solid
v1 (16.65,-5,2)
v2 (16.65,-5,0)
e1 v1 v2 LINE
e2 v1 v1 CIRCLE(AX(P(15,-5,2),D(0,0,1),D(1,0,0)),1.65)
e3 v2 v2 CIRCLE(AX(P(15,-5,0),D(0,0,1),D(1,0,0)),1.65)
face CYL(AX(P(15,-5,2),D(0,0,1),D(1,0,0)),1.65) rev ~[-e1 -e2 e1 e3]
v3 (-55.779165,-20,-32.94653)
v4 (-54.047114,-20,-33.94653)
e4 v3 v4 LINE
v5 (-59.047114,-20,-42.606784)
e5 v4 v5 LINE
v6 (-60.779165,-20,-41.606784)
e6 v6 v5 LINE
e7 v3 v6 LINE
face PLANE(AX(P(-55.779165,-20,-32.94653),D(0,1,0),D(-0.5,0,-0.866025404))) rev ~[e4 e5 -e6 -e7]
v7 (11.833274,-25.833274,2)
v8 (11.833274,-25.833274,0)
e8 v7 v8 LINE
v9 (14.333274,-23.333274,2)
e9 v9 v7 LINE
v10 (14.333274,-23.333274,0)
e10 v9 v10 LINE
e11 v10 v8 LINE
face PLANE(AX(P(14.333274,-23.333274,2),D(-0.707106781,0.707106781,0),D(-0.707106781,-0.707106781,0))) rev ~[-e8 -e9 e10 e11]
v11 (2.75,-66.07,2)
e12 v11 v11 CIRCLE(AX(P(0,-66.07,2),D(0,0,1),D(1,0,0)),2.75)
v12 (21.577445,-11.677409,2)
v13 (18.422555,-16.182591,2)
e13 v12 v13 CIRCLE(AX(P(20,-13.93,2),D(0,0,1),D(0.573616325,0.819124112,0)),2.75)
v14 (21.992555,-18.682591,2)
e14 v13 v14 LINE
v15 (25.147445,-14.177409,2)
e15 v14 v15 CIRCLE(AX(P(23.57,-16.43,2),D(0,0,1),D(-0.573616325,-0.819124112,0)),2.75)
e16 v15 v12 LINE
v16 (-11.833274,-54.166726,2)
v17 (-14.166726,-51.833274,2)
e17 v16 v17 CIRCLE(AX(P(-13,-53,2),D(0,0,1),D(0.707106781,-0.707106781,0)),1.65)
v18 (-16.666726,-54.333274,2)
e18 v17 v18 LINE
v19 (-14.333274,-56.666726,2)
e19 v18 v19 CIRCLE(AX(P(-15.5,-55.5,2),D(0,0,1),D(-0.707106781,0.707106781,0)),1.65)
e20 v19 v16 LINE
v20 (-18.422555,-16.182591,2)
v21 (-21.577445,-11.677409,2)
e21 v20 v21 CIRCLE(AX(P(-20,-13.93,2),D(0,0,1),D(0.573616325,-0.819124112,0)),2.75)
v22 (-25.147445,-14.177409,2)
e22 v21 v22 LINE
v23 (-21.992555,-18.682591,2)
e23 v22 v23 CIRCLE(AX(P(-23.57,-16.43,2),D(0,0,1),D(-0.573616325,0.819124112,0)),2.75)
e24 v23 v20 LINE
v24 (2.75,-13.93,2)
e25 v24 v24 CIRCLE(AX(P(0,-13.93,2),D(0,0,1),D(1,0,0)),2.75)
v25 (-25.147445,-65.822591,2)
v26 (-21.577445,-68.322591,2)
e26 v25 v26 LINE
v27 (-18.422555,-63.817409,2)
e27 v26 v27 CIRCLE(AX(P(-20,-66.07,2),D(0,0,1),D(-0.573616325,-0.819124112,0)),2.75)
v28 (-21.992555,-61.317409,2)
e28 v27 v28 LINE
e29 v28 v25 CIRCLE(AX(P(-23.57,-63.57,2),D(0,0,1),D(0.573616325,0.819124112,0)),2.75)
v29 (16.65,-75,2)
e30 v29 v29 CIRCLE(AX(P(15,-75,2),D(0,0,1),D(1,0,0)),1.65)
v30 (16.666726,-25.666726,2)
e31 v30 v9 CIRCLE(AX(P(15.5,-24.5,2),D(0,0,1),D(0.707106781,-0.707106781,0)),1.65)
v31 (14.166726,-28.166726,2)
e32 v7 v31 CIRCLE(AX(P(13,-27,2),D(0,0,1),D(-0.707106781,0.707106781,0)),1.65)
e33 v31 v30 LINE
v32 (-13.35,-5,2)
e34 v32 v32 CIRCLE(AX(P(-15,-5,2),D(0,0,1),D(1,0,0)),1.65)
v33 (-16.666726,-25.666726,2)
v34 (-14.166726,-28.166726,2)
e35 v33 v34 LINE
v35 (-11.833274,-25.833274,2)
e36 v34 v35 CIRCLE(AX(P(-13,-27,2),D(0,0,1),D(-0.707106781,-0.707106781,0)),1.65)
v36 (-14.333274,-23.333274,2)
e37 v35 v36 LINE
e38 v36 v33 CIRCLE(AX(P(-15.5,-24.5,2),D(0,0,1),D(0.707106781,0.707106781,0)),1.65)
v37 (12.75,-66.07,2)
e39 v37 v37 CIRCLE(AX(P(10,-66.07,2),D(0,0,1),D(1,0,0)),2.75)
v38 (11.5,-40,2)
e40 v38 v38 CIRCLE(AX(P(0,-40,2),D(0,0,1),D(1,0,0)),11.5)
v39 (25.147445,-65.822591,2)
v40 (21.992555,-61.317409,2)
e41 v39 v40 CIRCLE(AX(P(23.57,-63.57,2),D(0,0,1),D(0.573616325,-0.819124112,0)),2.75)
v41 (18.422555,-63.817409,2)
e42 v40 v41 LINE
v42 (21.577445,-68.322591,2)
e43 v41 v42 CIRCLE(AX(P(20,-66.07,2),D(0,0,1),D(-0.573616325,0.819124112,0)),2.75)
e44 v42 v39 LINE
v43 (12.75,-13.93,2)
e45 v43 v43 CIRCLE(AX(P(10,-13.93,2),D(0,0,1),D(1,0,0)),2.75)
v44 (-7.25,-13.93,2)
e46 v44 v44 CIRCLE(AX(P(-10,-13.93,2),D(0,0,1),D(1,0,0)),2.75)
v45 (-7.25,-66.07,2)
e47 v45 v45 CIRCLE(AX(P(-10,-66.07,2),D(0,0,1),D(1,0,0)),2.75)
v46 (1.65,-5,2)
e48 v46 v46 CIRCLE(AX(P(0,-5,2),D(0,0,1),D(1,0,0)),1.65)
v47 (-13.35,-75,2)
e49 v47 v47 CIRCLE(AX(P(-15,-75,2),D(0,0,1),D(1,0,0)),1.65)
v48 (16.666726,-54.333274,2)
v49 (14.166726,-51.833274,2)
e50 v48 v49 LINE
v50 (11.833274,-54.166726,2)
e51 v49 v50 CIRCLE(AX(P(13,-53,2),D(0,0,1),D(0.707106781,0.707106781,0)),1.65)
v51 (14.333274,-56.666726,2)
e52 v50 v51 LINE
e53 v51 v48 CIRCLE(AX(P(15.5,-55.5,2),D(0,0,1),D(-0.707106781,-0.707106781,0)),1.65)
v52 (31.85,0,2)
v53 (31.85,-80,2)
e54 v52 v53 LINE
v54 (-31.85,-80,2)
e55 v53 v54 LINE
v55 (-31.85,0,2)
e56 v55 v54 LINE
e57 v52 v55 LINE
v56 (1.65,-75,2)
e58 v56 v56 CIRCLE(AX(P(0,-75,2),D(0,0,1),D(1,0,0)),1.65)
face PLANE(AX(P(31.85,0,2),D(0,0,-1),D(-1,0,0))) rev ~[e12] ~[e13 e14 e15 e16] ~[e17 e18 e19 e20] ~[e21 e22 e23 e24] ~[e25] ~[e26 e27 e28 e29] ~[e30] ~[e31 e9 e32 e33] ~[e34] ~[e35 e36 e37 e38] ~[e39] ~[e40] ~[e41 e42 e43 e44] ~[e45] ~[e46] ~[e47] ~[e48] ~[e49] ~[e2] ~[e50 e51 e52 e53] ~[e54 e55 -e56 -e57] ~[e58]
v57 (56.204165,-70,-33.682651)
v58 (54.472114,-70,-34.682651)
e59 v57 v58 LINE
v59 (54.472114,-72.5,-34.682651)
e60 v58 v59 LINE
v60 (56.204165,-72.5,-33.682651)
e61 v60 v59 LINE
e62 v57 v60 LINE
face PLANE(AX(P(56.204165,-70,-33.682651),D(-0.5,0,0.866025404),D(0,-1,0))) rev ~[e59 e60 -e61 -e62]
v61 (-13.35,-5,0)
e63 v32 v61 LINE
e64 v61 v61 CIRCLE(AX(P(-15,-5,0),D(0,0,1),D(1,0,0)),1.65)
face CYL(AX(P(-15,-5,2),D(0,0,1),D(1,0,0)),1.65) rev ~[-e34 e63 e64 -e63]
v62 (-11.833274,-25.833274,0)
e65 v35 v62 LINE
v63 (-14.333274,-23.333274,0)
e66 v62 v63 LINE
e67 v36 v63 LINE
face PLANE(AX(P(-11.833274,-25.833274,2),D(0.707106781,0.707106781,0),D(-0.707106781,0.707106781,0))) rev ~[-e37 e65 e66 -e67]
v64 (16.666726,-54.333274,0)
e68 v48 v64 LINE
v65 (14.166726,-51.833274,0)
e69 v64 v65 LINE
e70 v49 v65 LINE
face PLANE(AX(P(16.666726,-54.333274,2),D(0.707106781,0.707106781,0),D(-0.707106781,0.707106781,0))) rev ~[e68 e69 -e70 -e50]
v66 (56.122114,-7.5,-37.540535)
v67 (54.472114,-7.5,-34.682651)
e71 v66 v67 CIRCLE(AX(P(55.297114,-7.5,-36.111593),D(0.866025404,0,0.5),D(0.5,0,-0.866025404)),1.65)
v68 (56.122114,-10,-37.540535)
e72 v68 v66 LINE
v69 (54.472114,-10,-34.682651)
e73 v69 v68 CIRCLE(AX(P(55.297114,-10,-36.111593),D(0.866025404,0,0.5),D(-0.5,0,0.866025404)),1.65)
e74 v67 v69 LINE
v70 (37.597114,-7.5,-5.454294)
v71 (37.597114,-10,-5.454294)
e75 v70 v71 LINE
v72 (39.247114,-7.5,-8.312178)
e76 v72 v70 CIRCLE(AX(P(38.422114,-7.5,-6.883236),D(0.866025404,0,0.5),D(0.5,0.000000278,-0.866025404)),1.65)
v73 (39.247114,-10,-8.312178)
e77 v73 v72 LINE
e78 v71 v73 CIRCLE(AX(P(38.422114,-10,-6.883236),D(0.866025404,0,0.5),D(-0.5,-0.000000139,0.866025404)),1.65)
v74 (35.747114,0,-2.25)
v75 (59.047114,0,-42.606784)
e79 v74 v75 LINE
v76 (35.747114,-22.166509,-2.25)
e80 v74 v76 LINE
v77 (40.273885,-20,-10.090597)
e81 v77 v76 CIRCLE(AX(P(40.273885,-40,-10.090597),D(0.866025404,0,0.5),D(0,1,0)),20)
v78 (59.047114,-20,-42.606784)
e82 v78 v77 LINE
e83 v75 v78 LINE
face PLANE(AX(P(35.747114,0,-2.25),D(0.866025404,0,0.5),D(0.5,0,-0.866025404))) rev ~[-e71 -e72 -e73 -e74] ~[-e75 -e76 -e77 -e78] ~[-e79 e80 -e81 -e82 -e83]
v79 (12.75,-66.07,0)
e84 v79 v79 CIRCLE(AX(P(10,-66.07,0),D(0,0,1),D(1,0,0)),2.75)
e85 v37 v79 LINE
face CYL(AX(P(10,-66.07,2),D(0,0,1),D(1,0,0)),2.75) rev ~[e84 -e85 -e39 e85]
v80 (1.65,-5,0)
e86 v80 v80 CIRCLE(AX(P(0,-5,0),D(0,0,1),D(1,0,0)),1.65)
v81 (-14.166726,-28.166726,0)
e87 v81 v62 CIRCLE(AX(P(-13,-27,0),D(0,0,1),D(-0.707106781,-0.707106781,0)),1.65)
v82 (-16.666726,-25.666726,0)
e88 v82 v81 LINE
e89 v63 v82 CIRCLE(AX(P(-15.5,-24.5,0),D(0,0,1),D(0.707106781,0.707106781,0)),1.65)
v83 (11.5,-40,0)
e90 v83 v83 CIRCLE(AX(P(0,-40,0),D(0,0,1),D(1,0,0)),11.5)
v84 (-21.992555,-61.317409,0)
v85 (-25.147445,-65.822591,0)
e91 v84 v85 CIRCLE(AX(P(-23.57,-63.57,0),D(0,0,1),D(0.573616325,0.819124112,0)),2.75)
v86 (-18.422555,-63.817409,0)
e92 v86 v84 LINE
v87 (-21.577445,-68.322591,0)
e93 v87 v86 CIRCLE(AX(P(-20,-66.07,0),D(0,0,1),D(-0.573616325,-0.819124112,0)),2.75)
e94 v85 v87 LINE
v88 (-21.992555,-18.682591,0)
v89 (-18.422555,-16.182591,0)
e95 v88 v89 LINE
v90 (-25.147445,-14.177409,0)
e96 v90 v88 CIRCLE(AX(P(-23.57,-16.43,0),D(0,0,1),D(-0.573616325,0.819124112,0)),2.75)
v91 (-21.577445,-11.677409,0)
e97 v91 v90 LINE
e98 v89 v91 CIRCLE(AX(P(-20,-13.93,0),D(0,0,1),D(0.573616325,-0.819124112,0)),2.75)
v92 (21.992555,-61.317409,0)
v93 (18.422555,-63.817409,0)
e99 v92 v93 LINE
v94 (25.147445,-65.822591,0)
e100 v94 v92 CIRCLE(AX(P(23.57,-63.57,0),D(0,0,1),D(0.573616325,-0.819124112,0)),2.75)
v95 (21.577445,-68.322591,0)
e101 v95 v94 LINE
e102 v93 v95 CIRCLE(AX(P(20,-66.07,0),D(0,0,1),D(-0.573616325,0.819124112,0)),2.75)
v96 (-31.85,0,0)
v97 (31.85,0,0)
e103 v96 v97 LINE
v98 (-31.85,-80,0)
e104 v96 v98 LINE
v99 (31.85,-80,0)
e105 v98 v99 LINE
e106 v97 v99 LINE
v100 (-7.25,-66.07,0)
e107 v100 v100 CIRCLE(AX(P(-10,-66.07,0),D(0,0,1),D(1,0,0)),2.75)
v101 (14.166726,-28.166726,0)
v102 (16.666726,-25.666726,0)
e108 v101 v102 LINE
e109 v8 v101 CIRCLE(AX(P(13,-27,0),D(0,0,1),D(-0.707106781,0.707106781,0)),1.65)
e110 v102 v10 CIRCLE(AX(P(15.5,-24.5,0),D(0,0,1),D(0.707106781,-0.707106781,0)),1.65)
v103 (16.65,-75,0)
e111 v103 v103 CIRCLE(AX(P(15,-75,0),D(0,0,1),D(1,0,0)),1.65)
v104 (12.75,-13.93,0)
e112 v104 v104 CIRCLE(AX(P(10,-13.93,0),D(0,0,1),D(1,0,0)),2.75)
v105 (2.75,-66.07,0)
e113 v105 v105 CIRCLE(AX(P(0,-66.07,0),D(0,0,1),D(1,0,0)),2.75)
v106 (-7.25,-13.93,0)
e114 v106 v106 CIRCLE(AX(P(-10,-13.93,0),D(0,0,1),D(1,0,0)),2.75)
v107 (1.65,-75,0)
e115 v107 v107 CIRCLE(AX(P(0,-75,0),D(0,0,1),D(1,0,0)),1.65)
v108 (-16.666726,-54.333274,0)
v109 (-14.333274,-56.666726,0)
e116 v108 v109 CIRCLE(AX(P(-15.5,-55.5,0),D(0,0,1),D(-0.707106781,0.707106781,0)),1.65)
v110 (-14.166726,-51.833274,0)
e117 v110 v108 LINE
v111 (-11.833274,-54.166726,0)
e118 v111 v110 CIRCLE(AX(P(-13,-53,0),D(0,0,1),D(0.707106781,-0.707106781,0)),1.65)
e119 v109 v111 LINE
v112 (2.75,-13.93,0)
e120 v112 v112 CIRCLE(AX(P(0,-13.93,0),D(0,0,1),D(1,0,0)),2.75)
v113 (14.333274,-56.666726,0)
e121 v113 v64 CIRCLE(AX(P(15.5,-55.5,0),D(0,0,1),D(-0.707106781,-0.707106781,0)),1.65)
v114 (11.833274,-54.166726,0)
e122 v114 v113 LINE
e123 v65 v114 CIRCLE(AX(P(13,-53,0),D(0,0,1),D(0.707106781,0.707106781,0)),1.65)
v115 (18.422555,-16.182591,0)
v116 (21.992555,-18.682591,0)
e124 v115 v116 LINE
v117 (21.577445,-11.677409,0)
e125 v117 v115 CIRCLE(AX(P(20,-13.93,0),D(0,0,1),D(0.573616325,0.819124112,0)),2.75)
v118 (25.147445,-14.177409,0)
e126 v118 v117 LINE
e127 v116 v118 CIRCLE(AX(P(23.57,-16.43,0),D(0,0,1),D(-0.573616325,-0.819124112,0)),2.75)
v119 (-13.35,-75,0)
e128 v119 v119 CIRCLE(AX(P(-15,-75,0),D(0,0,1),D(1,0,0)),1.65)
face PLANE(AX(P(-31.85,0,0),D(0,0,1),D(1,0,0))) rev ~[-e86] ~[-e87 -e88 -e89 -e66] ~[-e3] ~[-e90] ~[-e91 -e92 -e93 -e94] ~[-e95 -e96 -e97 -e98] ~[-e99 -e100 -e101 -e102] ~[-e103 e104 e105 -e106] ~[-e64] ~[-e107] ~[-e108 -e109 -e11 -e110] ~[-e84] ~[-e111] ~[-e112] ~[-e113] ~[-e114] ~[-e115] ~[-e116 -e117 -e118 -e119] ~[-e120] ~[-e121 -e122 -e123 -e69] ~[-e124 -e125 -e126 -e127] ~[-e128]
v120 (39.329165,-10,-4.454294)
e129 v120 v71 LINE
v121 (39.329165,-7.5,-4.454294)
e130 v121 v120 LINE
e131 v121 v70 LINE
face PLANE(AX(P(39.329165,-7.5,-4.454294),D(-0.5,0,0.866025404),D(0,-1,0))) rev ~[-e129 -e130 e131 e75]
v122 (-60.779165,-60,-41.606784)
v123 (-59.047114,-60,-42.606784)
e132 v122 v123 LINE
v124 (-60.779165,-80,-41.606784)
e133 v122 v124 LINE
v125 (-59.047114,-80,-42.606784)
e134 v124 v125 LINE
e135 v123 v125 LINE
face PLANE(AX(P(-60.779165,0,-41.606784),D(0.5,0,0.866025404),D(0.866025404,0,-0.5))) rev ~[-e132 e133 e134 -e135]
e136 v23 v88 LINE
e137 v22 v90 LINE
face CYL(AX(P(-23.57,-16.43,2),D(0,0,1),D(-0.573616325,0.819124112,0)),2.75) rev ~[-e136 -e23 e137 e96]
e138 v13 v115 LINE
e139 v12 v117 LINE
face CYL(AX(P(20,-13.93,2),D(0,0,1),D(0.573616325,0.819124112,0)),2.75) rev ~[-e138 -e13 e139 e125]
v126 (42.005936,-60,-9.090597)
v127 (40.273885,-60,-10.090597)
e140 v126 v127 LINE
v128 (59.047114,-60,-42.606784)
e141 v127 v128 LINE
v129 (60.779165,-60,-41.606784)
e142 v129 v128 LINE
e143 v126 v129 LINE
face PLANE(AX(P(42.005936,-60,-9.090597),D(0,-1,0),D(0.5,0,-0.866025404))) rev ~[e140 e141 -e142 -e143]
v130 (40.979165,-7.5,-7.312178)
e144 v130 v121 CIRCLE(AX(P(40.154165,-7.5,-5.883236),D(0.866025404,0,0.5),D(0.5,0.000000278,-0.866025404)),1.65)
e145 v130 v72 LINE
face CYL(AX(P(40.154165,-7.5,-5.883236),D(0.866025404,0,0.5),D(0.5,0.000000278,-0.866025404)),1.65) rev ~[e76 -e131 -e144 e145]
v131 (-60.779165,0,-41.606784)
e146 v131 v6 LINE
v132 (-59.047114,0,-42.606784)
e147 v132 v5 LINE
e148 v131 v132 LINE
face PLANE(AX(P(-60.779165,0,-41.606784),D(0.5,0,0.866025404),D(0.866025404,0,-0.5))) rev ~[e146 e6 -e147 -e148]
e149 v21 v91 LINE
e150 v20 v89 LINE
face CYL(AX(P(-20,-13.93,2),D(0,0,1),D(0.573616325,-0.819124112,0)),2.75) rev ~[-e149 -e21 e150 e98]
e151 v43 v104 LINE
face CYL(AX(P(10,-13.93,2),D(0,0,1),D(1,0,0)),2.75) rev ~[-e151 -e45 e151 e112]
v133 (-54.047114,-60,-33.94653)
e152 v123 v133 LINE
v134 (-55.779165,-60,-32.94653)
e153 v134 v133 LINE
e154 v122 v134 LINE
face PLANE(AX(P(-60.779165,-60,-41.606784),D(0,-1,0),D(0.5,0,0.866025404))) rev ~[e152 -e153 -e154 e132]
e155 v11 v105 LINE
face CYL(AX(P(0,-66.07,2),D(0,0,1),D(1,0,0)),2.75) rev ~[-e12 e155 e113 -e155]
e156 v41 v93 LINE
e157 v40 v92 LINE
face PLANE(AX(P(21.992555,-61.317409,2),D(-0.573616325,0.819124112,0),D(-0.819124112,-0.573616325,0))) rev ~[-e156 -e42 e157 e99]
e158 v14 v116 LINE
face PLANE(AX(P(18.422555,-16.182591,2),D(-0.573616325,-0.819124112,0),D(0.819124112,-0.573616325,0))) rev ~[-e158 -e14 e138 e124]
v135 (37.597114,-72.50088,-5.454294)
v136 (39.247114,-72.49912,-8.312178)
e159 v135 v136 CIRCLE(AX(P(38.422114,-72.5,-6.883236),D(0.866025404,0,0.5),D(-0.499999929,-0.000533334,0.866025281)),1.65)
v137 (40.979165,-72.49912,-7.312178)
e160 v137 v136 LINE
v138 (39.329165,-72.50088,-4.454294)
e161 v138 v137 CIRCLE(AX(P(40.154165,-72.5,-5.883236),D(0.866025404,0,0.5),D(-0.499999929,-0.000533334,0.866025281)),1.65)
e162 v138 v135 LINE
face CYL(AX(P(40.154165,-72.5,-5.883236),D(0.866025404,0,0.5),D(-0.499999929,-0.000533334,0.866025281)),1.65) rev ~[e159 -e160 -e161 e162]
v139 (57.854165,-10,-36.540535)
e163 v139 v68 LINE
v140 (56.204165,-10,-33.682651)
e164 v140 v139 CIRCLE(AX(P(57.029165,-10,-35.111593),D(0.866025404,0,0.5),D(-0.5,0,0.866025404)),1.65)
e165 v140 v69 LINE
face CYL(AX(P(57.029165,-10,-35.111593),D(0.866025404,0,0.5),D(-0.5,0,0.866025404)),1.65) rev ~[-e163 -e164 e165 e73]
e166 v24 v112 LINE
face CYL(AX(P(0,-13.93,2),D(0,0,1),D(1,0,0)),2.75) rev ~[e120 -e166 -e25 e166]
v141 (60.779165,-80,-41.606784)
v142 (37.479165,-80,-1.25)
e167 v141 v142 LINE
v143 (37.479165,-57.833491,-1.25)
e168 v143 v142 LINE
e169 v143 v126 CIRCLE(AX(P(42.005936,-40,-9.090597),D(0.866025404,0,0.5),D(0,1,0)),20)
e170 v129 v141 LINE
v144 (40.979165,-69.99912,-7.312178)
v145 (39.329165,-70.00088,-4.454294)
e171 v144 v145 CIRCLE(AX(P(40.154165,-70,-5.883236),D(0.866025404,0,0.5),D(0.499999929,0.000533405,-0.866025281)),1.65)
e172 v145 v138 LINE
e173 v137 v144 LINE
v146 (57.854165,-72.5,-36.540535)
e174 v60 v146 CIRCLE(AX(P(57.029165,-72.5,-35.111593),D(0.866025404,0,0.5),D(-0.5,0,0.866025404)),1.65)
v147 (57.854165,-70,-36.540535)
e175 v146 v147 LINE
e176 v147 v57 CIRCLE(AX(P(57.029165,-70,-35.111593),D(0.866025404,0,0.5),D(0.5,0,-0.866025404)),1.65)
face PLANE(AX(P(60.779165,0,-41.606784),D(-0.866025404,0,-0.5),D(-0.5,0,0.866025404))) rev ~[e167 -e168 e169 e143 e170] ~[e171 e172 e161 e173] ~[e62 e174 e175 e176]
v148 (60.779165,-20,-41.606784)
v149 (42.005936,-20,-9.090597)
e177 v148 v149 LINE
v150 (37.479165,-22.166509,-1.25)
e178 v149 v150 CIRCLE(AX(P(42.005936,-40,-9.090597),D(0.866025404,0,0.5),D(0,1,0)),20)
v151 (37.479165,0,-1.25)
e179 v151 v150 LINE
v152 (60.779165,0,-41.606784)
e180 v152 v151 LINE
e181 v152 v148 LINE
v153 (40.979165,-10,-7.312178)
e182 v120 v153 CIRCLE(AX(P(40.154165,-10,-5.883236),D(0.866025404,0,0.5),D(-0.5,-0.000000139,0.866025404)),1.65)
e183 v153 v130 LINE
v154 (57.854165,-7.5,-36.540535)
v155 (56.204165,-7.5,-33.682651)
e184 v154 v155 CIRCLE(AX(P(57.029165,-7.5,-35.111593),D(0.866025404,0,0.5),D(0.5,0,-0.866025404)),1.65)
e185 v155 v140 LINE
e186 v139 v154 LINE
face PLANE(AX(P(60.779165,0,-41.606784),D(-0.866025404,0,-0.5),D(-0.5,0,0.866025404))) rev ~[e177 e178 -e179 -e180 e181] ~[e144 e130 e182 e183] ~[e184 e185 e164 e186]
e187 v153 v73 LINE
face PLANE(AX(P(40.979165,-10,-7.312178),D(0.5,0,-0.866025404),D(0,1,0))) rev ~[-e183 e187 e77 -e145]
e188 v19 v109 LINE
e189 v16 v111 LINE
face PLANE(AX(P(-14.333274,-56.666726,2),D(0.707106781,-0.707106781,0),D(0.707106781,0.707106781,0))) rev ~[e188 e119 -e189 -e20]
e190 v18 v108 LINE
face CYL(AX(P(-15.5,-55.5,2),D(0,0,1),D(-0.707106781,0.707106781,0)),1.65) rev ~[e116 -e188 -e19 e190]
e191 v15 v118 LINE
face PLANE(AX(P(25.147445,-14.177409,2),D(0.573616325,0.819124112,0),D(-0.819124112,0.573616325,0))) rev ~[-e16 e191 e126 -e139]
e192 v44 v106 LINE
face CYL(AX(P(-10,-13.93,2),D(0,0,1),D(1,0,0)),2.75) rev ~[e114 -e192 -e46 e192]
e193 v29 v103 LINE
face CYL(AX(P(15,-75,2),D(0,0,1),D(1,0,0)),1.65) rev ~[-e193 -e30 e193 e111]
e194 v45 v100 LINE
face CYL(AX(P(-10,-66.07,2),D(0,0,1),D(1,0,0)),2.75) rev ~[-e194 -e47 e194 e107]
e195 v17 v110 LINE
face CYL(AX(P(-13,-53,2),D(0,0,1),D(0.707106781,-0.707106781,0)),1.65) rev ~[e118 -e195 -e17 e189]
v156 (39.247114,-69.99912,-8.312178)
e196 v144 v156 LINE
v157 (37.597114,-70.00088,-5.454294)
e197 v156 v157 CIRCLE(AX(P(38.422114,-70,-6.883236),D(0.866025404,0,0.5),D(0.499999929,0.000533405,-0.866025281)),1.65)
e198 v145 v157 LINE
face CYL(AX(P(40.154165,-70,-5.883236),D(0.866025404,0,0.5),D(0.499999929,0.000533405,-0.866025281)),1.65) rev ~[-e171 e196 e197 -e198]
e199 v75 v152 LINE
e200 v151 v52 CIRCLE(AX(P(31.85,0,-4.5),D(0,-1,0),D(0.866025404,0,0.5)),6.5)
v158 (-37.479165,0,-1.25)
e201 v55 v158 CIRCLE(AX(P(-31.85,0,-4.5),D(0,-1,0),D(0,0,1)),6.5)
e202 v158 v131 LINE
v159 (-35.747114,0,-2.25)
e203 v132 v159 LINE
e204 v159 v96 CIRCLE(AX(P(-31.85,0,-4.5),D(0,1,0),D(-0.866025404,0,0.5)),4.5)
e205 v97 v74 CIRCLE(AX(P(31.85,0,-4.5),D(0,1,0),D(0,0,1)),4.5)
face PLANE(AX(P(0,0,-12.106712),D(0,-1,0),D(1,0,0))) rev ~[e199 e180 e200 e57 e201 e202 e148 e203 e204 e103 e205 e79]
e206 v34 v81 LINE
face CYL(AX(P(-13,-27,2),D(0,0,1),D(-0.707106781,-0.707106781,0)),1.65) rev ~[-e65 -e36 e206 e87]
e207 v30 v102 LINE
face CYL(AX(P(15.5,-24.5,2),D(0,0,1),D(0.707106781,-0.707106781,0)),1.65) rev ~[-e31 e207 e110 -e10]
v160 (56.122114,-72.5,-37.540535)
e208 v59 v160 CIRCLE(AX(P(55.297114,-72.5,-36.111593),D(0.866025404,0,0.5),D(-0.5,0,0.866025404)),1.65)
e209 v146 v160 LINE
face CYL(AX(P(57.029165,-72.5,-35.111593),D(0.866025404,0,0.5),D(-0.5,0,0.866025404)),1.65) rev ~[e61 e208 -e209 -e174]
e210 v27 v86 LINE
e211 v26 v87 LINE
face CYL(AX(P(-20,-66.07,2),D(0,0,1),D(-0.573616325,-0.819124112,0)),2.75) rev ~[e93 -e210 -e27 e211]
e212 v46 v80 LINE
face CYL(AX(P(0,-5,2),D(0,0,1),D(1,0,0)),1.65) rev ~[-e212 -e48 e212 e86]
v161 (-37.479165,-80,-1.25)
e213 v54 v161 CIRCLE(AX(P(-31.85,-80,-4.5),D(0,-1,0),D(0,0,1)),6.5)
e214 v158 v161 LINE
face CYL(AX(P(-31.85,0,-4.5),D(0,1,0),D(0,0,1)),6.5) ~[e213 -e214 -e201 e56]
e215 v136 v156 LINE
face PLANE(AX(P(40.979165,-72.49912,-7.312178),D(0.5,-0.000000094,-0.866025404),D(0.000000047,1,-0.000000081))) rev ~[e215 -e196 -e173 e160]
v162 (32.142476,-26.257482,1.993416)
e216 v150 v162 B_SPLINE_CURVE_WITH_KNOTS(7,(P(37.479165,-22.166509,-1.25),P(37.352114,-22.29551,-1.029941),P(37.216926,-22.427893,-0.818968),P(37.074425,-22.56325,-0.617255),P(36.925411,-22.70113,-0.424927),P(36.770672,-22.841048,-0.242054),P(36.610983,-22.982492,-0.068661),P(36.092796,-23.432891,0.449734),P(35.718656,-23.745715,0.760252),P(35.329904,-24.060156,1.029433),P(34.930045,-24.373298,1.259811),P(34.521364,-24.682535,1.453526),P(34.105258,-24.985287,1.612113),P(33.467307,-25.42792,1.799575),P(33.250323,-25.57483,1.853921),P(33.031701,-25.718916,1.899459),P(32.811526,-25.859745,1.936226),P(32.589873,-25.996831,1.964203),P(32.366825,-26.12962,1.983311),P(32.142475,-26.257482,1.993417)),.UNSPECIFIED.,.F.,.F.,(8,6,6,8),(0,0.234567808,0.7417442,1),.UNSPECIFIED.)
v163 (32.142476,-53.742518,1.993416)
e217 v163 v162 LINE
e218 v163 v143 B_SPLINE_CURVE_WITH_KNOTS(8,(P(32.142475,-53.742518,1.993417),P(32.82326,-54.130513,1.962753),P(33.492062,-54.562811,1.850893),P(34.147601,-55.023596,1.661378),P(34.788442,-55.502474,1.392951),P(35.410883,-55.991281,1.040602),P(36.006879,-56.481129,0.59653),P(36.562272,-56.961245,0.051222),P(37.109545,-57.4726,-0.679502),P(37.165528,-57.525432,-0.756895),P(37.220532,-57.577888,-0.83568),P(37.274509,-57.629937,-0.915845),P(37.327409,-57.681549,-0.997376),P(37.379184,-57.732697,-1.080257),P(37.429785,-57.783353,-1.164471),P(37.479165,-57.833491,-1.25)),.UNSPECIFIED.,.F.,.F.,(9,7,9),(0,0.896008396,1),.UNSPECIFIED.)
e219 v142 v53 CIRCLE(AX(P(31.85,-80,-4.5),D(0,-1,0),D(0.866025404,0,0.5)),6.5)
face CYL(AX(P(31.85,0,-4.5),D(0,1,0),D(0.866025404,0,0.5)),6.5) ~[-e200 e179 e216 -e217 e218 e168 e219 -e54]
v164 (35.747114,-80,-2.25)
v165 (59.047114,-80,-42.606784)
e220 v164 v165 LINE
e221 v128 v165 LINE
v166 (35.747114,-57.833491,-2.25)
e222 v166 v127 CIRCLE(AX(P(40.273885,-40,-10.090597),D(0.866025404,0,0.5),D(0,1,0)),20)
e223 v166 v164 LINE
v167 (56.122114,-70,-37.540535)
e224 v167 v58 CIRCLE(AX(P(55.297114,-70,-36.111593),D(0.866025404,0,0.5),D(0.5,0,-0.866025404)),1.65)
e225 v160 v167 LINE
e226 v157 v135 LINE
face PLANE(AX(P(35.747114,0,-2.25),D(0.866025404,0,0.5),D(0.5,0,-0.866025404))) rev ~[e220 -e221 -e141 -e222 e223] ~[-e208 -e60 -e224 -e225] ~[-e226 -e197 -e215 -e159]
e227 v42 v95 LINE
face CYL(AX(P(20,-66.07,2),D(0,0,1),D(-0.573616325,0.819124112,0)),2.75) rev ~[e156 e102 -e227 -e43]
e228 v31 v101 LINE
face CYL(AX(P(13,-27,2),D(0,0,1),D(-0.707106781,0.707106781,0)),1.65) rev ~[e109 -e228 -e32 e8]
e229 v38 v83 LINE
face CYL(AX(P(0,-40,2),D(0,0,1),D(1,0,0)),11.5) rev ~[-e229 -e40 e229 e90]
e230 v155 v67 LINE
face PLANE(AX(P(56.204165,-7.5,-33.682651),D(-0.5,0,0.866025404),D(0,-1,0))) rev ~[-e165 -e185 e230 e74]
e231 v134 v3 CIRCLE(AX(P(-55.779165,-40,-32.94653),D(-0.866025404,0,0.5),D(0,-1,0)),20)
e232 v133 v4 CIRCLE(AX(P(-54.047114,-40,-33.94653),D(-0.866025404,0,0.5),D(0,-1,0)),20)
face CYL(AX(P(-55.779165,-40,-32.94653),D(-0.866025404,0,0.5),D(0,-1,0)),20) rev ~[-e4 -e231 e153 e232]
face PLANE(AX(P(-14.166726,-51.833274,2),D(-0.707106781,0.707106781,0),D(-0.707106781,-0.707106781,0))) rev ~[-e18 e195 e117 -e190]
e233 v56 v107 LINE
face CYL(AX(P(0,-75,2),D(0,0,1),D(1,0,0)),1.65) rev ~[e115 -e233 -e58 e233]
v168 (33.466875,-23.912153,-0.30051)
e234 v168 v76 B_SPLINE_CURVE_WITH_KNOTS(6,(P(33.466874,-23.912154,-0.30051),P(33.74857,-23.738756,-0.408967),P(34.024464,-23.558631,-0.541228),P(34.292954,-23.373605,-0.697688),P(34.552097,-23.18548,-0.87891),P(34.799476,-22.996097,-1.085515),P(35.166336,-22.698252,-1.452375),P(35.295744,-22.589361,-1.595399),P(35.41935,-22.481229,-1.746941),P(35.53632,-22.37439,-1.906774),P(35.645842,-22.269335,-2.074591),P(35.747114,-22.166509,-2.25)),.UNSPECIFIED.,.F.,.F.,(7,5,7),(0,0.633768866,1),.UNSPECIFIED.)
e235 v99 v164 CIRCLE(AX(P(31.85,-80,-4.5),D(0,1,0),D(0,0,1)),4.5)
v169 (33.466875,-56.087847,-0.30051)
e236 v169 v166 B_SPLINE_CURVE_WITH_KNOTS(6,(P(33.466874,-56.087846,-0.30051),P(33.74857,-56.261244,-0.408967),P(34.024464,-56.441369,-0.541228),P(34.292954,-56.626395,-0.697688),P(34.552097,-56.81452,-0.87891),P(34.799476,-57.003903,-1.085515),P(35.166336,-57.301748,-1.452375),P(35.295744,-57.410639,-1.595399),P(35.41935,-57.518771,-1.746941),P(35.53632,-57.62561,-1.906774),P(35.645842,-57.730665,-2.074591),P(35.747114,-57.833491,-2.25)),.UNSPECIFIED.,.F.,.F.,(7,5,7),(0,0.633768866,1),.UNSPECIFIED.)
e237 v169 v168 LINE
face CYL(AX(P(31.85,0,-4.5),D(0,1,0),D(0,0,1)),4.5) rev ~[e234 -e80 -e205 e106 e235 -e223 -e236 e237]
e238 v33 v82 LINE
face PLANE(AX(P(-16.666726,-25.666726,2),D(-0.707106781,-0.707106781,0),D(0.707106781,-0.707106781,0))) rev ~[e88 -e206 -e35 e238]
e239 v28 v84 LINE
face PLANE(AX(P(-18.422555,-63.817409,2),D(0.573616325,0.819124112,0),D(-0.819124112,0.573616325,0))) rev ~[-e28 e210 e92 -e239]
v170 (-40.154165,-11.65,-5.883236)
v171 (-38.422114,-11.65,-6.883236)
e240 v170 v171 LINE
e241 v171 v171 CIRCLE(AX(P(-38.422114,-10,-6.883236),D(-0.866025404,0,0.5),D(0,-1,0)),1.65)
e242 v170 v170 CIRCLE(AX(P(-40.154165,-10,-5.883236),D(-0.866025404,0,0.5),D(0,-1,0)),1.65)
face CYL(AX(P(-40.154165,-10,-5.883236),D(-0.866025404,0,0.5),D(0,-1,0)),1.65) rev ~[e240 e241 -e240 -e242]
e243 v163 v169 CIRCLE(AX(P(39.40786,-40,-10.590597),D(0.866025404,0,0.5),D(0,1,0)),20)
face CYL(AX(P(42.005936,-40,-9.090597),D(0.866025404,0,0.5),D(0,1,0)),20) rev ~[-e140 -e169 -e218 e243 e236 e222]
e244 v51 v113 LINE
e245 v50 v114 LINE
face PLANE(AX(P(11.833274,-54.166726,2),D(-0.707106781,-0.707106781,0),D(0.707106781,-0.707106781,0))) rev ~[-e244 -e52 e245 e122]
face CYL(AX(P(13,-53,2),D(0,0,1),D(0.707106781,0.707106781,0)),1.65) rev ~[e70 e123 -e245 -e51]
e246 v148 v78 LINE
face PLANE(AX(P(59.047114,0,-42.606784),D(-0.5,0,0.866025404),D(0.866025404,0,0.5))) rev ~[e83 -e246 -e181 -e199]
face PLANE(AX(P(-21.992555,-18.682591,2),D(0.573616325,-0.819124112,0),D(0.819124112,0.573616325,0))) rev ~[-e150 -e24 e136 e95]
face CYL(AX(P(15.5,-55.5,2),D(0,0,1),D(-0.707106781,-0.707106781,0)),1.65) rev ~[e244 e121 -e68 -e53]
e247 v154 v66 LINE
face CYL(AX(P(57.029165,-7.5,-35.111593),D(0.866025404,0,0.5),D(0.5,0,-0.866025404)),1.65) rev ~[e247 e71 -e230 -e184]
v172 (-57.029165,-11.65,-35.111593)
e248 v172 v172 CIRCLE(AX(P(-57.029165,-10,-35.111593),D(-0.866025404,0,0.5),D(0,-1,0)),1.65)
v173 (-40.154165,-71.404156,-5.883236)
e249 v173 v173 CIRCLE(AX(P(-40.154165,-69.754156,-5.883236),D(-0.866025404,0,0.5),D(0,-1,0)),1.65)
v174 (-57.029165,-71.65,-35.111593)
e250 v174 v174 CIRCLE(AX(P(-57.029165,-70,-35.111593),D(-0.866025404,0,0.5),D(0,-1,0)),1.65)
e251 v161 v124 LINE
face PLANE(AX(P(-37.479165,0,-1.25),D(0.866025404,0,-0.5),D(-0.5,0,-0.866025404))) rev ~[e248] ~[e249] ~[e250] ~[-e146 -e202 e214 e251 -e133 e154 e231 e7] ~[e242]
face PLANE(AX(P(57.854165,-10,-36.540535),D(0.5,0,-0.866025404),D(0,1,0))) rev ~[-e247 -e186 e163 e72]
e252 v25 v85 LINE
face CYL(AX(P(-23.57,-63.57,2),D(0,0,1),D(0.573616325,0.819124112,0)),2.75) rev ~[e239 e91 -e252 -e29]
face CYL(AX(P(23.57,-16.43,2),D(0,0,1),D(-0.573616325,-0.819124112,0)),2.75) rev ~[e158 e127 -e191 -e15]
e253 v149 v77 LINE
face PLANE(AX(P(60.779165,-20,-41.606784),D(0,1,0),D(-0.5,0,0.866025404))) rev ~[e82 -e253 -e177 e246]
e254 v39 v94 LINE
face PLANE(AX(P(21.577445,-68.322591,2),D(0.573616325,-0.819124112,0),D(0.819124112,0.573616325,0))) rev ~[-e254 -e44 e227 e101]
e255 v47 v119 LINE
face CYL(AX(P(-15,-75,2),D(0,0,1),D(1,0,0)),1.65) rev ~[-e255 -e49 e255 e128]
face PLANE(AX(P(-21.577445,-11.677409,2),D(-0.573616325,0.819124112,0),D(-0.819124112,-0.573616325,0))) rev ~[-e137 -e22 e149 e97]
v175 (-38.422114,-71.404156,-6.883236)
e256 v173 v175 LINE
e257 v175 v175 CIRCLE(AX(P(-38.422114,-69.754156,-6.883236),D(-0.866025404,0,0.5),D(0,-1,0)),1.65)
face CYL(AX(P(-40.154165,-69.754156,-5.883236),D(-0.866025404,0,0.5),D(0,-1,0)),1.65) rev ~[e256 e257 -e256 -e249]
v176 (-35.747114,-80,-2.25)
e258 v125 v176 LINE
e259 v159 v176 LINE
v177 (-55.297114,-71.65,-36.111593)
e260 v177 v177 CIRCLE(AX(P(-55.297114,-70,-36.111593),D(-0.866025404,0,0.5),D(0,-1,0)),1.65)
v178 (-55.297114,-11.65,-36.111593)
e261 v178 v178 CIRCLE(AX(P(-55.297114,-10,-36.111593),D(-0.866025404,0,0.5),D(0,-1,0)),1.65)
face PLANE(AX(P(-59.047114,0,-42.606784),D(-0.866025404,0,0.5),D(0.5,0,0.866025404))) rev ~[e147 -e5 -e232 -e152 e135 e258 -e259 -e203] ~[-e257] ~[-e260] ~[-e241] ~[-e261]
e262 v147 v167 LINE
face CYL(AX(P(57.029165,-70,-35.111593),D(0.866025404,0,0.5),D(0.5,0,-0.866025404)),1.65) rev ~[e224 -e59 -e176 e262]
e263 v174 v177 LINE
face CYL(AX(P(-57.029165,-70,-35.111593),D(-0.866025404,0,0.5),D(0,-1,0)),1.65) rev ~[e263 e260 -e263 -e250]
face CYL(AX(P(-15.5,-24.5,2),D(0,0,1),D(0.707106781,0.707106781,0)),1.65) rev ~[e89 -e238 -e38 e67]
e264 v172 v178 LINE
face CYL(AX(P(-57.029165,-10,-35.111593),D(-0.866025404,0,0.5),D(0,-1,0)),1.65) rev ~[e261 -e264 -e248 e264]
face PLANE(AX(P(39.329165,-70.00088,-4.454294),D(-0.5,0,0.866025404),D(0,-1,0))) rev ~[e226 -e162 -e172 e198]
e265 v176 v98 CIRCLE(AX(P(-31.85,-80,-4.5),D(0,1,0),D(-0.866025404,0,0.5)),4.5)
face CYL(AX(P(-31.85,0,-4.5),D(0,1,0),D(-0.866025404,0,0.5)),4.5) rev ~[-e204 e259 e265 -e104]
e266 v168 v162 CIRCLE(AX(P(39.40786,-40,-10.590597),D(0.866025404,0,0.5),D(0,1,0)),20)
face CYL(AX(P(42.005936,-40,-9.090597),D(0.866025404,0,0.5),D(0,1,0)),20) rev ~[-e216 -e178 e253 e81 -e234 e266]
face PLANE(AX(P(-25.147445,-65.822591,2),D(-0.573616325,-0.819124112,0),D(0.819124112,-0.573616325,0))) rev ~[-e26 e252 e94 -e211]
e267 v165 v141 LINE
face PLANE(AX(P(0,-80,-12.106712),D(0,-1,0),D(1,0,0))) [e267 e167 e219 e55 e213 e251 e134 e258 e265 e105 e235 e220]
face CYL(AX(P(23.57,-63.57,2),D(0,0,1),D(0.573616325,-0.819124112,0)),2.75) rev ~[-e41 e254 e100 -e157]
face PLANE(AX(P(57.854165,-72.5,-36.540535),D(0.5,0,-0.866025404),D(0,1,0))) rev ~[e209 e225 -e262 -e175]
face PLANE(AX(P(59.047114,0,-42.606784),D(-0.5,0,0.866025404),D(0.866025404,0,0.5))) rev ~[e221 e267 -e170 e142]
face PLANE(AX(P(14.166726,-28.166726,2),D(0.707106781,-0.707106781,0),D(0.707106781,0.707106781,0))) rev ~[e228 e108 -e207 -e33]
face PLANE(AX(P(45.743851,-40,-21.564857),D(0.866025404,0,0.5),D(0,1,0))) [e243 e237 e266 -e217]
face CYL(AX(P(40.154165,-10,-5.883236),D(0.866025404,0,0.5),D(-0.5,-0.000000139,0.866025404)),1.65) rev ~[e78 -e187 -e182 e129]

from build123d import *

# Parameters (mm, degrees)
F1_DEPTH = 80
F3_DEPTH = 3
F4_R     = 1.65
F5_DEPTH = 3
F6_R     = 11.5
F6_R_2   = 1.65
F6_R_3   = 2.75
F7_DEPTH = 3


# Not quite as in the source:
# - ends of sketch curves that miss each other by under 0.0002 mm in the source are joined


with BuildPart() as f1:
    # F0 (on Front) → F1 (new body)
    with BuildSketch(Plane.XZ):
        with BuildLine():
            ThreePointArc((-35.747114317, -2.25), (-34.1, -0.602885683), (-31.85, 0))
            Line((-31.85, 0), (31.85, 0))
            ThreePointArc((31.85, 0), (34.1, -0.602885683), (35.747114317, -2.25))
            Line((35.747114317, -2.25), (59.047114317, -42.6067838164))
            Line((59.047114317, -42.6067838164), (60.7791651246, -41.6067838164))
            Line((60.7791651246, -41.6067838164), (37.4791651246, -1.25))
            ThreePointArc((37.4791651246, -1.25), (35.1, 1.1291651246), (31.85, 2))
            Line((31.85, 2), (-31.85, 2))
            ThreePointArc((-31.85, 2), (-35.1, 1.1291651246), (-37.4791651246, -1.25))
            Line((-37.4791651246, -1.25), (-60.7791651246, -41.6067838164))
            Line((-60.7791651246, -41.6067838164), (-59.047114317, -42.6067838164))
            Line((-59.047114317, -42.6067838164), (-35.747114317, -2.25))
        make_face()
    extrude(amount=F1_DEPTH)

    # F2 (on face) → F3 (cut)
    with BuildSketch(Plane(origin=(27.5681079661, 0, 15.9164545553), x_dir=(0, 1, 0), z_dir=(0.8660254038, 0, 0.5))):
        with BuildLine():
            Line((-20, -66.422114317), (-20, -28.8756559143))
            ThreePointArc((-20, -28.8756559143), (-40, -8.8756559143), (-60, -28.8756559143))
            Line((-60, -28.8756559143), (-60, -66.422114317))
            Line((-60, -66.422114317), (-20, -66.422114317))
        make_face()
        with BuildLine():
            Line((-72.5, -60.572114317), (-70, -60.572114317))
            ThreePointArc((-70, -60.572114317), (-68.35, -58.922114317), (-70, -57.272114317))
            Line((-70, -57.272114317), (-72.5, -57.272114317))
            ThreePointArc((-72.5, -57.272114317), (-74.15, -58.922114317), (-72.5, -60.572114317))
        make_face()
        with BuildLine():
            Line((-70.0008798832, -23.522114317), (-72.5008798832, -23.522114317))
            ThreePointArc((-72.5008798832, -23.522114317), (-74.1499997654, -25.1729942001), (-72.499120117, -26.8221140824))
            Line((-72.499120117, -26.8221140824), (-69.9991201168, -26.822114317))
            ThreePointArc((-69.9991201168, -26.822114317), (-68.3500002346, -25.171234434), (-70.0008798832, -23.522114317))
        make_face()
        with BuildLine():
            Line((-9.9999995409, -26.822114317), (-7.4999995409, -26.822114317))
            ThreePointArc((-7.4999995409, -26.822114317), (-5.85, -25.1721140875), (-7.5, -23.522114317))
            Line((-7.5, -23.522114317), (-10, -23.522114317))
            ThreePointArc((-10, -23.522114317), (-11.6499997705, -25.1721145466), (-9.9999995409, -26.822114317))
        make_face()
        with BuildLine():
            Line((-10, -60.572114317), (-7.5, -60.572114317))
            ThreePointArc((-7.5, -60.572114317), (-5.85, -58.922114317), (-7.5, -57.272114317))
            Line((-7.5, -57.272114317), (-10, -57.272114317))
            ThreePointArc((-10, -57.272114317), (-11.65, -58.922114317), (-10, -60.572114317))
        make_face()
    extrude(amount=-F3_DEPTH, mode=Mode.SUBTRACT)

    # F4 (on face) → F5 (cut)
    with BuildSketch(Plane(origin=(-27.5681079661, 0, 15.9164545553), x_dir=(0, -1, 0), z_dir=(-0.8660254038, 0, 0.5))):
        with BuildLine():
            Line((20, -56.422114317), (60, -56.422114317))
            ThreePointArc((60, -56.422114317), (40, -36.422114317), (20, -56.422114317))
        make_face()
        with BuildLine():
            Line((60, -66.422114317), (60, -56.422114317))
            ThreePointArc((60, -56.422114317), (59.3185165258, -61.5984952191), (57.3205080757, -66.422114317))
            Line((57.3205080757, -66.422114317), (60, -66.422114317))
        make_face()
        with BuildLine():
            ThreePointArc((57.3205080757, -66.422114317), (59.3185165258, -61.5984952191), (60, -56.422114317))
            Line((60, -56.422114317), (20, -56.422114317))
            ThreePointArc((20, -56.422114317), (20.6814834742, -61.5984952191), (22.6794919243, -66.422114317))
            Line((22.6794919243, -66.422114317), (57.3205080757, -66.422114317))
        make_face()
        with BuildLine():
            ThreePointArc((22.6794919243, -66.422114317), (20.6814834742, -61.5984952191), (20, -56.422114317))
            Line((20, -56.422114317), (20, -66.422114317))
            Line((20, -66.422114317), (22.6794919243, -66.422114317))
        make_face()
        with BuildLine():
            ThreePointArc((22.6794919243, -66.422114317), (40, -76.422114317), (57.3205080757, -66.422114317))
            Line((57.3205080757, -66.422114317), (22.6794919243, -66.422114317))
        make_face()
        with Locations((70, -58.922114317)):
            Circle(F4_R)
        with Locations((69.7541560233, -25.172114317)):
            Circle(F4_R)
        with Locations((10, -58.922114317)):
            Circle(F4_R)
        with Locations((10, -25.172114317)):
            Circle(F4_R)
    extrude(amount=-F5_DEPTH, mode=Mode.SUBTRACT)

    # F6 (on face) → F7 (cut)
    with BuildSketch(Plane.XY.offset(2)):
        with Locations((0, -40)):
            Circle(F6_R)
        with Locations((-15, -5)):
            Circle(F6_R_2)
        with Locations((0, -5)):
            Circle(F6_R_2)
        with Locations((15, -5)):
            Circle(F6_R_2)
        with Locations((-10, -13.93)):
            Circle(F6_R_3)
        with Locations((0, -13.93)):
            Circle(F6_R_3)
        with Locations((10, -13.93)):
            Circle(F6_R_3)
        with Locations((-10, -66.07)):
            Circle(F6_R_3)
        with Locations((0, -66.07)):
            Circle(F6_R_3)
        with Locations((10, -66.07)):
            Circle(F6_R_3)
        with Locations((0, -75)):
            Circle(F6_R_2)
        with Locations((-15, -75)):
            Circle(F6_R_2)
        with Locations((15, -75)):
            Circle(F6_R_2)
        with BuildLine():
            Line((-18.4225551057, -63.817408691), (-21.9925551057, -61.317408691))
            ThreePointArc((-21.9925551057, -61.317408691), (-25.822591309, -61.9925551057), (-25.1474448943, -65.822591309))
            Line((-25.1474448943, -65.822591309), (-21.5774448943, -68.322591309))
            ThreePointArc((-21.5774448943, -68.322591309), (-17.747408691, -67.6474448943), (-18.4225551057, -63.817408691))
        make_face()
        with BuildLine():
            Line((-21.5774448943, -11.677408691), (-25.1474448943, -14.177408691))
            ThreePointArc((-25.1474448943, -14.177408691), (-25.822591309, -18.0074448943), (-21.9925551057, -18.682591309))
            Line((-21.9925551057, -18.682591309), (-18.4225551057, -16.182591309))
            ThreePointArc((-18.4225551057, -16.182591309), (-17.747408691, -12.3525551057), (-21.5774448943, -11.677408691))
        make_face()
        with BuildLine():
            Line((25.1474448943, -14.177408691), (21.5774448943, -11.677408691))
            ThreePointArc((21.5774448943, -11.677408691), (17.747408691, -12.3525551057), (18.4225551057, -16.182591309))
            Line((18.4225551057, -16.182591309), (21.9925551057, -18.682591309))
            ThreePointArc((21.9925551057, -18.682591309), (25.822591309, -18.0074448943), (25.1474448943, -14.177408691))
        make_face()
        with BuildLine():
            Line((21.9925551057, -61.317408691), (18.4225551057, -63.817408691))
            ThreePointArc((18.4225551057, -63.817408691), (17.747408691, -67.6474448943), (21.5774448943, -68.322591309))
            Line((21.5774448943, -68.322591309), (25.1474448943, -65.822591309))
            ThreePointArc((25.1474448943, -65.822591309), (25.822591309, -61.9925551057), (21.9925551057, -61.317408691))
        make_face()
        with BuildLine():
            Line((-11.833273811, -25.833273811), (-14.333273811, -23.333273811))
            ThreePointArc((-14.333273811, -23.333273811), (-16.666726189, -23.333273811), (-16.666726189, -25.666726189))
            Line((-16.666726189, -25.666726189), (-14.166726189, -28.166726189))
            ThreePointArc((-14.166726189, -28.166726189), (-11.833273811, -28.166726189), (-11.833273811, -25.833273811))
        make_face()
        with BuildLine():
            Line((-14.333273811, -56.666726189), (-11.833273811, -54.166726189))
            ThreePointArc((-11.833273811, -54.166726189), (-11.833273811, -51.833273811), (-14.166726189, -51.833273811))
            Line((-14.166726189, -51.833273811), (-16.666726189, -54.333273811))
            ThreePointArc((-16.666726189, -54.333273811), (-16.666726189, -56.666726189), (-14.333273811, -56.666726189))
        make_face()
        with BuildLine():
            Line((16.666726189, -54.333273811), (14.166726189, -51.833273811))
            ThreePointArc((14.166726189, -51.833273811), (11.833273811, -51.833273811), (11.833273811, -54.166726189))
            Line((11.833273811, -54.166726189), (14.333273811, -56.666726189))
            ThreePointArc((14.333273811, -56.666726189), (16.666726189, -56.666726189), (16.666726189, -54.333273811))
        make_face()
        with BuildLine():
            Line((14.333273811, -23.333273811), (11.833273811, -25.833273811))
            ThreePointArc((11.833273811, -25.833273811), (11.833273811, -28.166726189), (14.166726189, -28.166726189))
            Line((14.166726189, -28.166726189), (16.666726189, -25.666726189))
            ThreePointArc((16.666726189, -25.666726189), (16.666726189, -23.333273811), (14.333273811, -23.333273811))
        make_face()
    extrude(amount=-F7_DEPTH, mode=Mode.SUBTRACT)


solid = f1.part
